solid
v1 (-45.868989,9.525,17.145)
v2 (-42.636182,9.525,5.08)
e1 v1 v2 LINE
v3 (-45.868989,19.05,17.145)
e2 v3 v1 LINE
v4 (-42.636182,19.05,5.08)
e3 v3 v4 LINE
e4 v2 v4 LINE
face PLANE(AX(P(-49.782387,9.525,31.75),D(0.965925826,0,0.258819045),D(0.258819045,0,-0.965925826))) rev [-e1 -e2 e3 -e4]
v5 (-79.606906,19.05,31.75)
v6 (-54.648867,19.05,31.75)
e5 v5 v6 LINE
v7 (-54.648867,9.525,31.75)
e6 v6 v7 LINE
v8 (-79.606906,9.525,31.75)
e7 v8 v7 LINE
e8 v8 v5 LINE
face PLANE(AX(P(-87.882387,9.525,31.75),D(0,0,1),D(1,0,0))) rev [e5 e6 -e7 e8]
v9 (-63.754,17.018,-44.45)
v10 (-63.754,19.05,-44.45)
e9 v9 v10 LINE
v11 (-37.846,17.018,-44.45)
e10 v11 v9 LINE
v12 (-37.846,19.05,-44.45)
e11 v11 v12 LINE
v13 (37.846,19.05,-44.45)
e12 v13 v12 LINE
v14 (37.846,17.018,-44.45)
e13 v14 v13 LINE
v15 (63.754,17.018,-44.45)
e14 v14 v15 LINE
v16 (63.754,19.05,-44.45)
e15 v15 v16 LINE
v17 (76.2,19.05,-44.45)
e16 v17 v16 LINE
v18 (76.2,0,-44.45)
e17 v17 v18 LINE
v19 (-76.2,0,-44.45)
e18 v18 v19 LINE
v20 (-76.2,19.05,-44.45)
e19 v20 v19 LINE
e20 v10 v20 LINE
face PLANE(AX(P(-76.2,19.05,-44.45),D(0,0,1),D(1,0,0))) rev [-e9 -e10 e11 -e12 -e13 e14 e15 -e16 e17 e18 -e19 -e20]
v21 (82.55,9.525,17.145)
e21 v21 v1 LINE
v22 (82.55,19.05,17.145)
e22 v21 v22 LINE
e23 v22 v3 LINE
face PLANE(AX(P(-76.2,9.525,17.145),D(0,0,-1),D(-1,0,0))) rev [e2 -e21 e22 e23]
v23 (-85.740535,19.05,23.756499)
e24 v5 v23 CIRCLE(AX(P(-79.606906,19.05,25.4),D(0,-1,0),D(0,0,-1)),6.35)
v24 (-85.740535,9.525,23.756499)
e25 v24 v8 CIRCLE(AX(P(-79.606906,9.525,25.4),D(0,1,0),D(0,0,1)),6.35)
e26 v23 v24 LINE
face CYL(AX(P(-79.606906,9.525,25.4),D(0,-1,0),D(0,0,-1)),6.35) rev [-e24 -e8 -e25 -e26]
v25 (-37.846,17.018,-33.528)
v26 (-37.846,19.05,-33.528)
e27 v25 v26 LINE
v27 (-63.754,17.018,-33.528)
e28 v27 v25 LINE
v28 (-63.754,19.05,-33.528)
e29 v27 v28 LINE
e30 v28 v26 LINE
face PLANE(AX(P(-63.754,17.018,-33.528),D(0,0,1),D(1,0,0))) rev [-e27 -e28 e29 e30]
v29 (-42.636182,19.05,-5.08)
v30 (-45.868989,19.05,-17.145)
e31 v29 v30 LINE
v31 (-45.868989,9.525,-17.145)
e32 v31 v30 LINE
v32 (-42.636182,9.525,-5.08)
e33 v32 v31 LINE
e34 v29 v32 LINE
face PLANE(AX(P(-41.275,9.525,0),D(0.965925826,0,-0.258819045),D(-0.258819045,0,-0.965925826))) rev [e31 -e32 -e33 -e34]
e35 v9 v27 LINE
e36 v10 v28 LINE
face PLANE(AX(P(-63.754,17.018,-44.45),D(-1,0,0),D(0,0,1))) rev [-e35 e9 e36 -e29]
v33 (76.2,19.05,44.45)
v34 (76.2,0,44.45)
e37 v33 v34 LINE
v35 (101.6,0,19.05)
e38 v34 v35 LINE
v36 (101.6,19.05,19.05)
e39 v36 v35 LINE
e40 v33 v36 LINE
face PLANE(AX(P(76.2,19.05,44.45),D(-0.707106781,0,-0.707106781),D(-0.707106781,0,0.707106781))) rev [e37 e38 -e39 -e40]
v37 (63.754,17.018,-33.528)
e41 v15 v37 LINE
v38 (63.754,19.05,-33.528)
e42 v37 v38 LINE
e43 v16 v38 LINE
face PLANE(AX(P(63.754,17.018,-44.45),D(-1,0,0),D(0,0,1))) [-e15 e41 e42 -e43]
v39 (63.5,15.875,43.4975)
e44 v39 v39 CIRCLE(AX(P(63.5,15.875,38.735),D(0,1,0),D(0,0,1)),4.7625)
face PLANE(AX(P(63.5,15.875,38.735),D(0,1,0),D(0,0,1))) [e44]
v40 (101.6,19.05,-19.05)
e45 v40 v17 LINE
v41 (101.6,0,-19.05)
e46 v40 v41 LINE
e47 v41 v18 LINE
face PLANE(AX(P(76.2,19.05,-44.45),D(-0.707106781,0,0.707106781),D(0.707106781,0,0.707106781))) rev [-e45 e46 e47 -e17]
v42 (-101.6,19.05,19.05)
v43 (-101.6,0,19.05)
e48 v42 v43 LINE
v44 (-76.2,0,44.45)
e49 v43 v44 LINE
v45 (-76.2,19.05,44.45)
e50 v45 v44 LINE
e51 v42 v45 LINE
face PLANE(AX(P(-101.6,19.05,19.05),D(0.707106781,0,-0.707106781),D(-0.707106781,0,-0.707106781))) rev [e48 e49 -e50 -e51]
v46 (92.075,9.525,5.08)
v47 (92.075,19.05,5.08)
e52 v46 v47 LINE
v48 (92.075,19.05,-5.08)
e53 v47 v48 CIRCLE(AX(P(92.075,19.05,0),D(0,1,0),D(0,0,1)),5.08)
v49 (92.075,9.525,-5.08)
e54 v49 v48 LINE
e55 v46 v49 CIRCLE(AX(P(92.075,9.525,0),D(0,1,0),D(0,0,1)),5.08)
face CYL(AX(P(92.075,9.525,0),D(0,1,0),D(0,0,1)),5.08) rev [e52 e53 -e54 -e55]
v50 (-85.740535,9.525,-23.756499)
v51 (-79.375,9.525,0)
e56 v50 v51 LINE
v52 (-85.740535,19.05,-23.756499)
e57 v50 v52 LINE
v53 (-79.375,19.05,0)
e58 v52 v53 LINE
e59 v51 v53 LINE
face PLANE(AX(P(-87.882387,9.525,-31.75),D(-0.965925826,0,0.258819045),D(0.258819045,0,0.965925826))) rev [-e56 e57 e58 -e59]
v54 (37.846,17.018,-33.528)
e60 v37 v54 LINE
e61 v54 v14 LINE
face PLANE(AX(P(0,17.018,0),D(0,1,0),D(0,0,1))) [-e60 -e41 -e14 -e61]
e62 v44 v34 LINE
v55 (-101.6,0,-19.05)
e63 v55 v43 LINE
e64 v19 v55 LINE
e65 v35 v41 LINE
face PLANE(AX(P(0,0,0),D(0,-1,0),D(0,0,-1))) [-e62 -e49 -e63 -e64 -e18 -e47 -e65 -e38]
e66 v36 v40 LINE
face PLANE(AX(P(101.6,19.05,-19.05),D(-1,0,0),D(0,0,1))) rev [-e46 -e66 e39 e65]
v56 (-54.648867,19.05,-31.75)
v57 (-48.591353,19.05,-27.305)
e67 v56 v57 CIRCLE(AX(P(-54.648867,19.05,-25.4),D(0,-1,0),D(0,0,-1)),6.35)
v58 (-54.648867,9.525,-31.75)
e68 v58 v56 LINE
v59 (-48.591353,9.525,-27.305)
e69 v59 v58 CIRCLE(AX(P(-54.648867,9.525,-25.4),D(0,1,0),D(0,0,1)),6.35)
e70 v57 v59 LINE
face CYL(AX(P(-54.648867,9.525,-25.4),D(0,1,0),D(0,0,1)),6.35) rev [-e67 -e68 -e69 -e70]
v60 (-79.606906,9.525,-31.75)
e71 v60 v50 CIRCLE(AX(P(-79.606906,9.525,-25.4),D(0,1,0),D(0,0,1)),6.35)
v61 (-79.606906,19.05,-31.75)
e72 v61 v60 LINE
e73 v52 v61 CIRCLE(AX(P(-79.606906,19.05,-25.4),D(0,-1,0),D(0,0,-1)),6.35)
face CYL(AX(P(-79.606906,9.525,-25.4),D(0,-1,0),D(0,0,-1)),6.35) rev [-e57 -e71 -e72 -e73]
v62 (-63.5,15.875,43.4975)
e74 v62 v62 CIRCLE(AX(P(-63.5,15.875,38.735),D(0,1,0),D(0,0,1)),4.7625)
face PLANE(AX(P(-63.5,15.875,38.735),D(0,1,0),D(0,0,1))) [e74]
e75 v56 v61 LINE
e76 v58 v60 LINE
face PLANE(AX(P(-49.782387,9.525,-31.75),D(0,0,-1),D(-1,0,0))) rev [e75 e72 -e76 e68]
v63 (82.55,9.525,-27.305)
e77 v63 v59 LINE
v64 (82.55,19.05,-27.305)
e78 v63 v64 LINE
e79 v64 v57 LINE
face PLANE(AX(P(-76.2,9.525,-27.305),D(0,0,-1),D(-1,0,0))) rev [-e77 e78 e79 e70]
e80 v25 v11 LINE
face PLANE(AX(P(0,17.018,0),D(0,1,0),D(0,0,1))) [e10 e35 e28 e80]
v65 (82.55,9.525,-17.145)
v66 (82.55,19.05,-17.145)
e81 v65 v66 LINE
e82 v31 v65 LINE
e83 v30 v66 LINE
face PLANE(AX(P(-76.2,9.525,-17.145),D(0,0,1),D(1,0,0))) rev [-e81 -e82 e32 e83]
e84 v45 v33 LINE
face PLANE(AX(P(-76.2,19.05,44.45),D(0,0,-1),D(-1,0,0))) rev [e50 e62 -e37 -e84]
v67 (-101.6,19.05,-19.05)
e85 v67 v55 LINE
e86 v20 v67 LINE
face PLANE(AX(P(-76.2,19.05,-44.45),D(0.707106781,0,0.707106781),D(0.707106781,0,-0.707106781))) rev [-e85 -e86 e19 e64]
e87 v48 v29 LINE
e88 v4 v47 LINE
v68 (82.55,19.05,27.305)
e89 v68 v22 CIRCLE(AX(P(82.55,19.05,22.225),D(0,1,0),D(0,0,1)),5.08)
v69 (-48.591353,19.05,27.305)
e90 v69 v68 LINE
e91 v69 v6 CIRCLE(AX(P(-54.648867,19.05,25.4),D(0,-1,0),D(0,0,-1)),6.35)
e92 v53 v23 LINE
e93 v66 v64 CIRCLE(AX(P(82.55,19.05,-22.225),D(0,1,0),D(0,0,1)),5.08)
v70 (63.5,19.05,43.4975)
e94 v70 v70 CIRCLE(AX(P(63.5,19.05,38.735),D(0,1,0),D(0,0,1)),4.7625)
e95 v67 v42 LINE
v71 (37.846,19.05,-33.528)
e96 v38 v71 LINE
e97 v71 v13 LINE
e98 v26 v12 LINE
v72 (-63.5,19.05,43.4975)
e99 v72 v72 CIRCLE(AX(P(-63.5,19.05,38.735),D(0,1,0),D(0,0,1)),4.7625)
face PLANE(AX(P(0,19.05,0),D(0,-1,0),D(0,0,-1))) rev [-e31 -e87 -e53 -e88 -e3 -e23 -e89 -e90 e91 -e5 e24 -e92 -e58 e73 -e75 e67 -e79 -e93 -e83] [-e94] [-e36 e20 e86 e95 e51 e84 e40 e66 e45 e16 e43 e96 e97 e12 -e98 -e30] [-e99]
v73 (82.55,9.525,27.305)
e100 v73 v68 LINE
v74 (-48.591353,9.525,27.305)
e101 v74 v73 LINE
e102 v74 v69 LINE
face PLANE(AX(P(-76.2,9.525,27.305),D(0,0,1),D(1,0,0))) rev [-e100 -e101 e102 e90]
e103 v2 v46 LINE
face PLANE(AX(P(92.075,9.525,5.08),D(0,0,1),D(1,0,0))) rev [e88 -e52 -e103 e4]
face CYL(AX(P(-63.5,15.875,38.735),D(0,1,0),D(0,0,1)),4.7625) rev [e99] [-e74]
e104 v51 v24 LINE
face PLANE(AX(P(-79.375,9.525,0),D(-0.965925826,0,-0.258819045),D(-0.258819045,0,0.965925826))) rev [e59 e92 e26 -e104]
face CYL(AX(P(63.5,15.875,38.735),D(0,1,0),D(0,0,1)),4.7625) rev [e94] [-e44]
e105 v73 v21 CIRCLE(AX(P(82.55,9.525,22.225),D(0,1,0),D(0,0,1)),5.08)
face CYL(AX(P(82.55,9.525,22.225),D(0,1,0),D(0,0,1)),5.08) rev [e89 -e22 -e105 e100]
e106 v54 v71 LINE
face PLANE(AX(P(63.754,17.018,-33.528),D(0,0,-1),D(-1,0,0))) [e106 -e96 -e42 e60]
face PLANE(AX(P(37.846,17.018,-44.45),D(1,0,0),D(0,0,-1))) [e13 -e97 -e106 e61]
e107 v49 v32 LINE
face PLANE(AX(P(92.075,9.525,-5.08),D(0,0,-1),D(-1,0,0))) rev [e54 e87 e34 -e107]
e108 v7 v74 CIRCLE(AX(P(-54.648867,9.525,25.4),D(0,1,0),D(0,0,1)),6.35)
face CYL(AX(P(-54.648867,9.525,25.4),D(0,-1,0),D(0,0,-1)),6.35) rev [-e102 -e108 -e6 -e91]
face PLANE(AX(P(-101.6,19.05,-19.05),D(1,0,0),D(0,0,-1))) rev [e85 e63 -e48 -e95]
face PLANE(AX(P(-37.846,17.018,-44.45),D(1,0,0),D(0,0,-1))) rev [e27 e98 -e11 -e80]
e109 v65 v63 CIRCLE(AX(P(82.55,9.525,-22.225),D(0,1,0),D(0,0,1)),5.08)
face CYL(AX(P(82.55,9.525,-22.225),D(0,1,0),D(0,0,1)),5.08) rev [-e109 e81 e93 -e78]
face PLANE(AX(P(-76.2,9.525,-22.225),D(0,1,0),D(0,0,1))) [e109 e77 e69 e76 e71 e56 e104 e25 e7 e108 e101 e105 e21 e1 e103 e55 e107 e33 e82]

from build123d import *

# Parameters (mm, degrees)
BOSS_EXTRUDE1_DEPTH = 19.05
CUT_EXTRUDE1_DEPTH  = 9.525
CUT_EXTRUDE2_DEPTH  = 9.525
FILLET2_R           = 6.35
SKETCH5_R           = 4.7625
CUT_EXTRUDE3_DEPTH  = 3.175
SKETCH6_W           = 25.908
SKETCH6_H           = 10.922
CUT_EXTRUDE4_DEPTH  = 2.032


with BuildPart() as part:
    # Sketch1 → Boss-Extrude1 (new body)
    with BuildSketch(Plane(origin=(0, 0, 0), x_dir=(1, 0, 0), z_dir=(0, 1, 0))):
        Polygon((-101.6, -19.05), (-76.2, -44.45), (76.2, -44.45), (101.6, -19.05), (101.6, 19.05), (76.2, 44.45), (-76.2, 44.45), (-101.6, 19.05), align=None)
    extrude(amount=BOSS_EXTRUDE1_DEPTH)

    # Sketch2 → Cut-Extrude1 (cut)
    with BuildSketch(Plane(origin=(0, 19.05, 0), x_dir=(1, 0, 0), z_dir=(0, 1, 0))):
        with BuildLine():
            Line((-76.2, 27.305), (82.55, 27.305))
            ThreePointArc((82.55, 27.305), (87.63, 22.225), (82.55, 17.145))
            Line((82.55, 17.145), (-76.2, 17.145))
            ThreePointArc((-76.2, 17.145), (-81.28, 22.225), (-76.2, 27.305))
        make_face()
        with BuildLine():
            Line((92.075, -5.08), (-66.675, -5.08))
            ThreePointArc((-66.675, -5.08), (-71.755, 0), (-66.675, 5.08))
            Line((-66.675, 5.08), (92.075, 5.08))
            ThreePointArc((92.075, 5.08), (97.155, 0), (92.075, -5.08))
        make_face()
        with BuildLine():
            Line((-76.2, -17.145), (82.55, -17.145))
            ThreePointArc((82.55, -17.145), (87.63, -22.225), (82.55, -27.305))
            Line((82.55, -27.305), (-76.2, -27.305))
            ThreePointArc((-76.2, -27.305), (-81.28, -22.225), (-76.2, -17.145))
        make_face()
    extrude(amount=-CUT_EXTRUDE1_DEPTH, mode=Mode.SUBTRACT)

    # Sketch3 → Cut-Extrude2 (cut)
    with BuildSketch(Plane(origin=(0, 19.05, 0), x_dir=(1, 0, 0), z_dir=(0, 1, 0))):
        Polygon((-87.88238686, 31.75), (-79.375, 0), (-87.88238686, -31.75), (-49.78238686, -31.75), (-41.275, 0), (-49.78238686, 31.75), align=None)
    extrude(amount=-CUT_EXTRUDE2_DEPTH, mode=Mode.SUBTRACT)

    # Fillet2
    # the kernel refuses this fillet: 6.35 mm, written as the material it adds along each edge
    with BuildSketch(Plane(origin=(-49.78238686, 19.05, 31.75), x_dir=(-1, 0, 0), z_dir=(0, -1, 0))) as fillet2_piece_1:
        with BuildLine():
            CenterArc((4.866479769, 6.35), FILLET2_R, 197.457603124, 72.542396876)
            Line((-1.19103416, 4.445), (0, 0))
            Line((0, 0), (4.866479769, 0))
        make_face()
    extrude(amount=9.525)
    with BuildSketch(Plane(origin=(-49.78238686, 19.05, -31.75), x_dir=(0.2588190451025257, 0, 0.9659258262890671), z_dir=(0, -1, 0))) as fillet2_piece_2:
        with BuildLine():
            CenterArc((4.87409135, 6.344159428), FILLET2_R, 195, 72.542396876)
            Line((-1.259537647, 4.700658492), (0, 0))
            Line((0, 0), (4.601802622, 0))
        make_face()
    extrude(amount=9.525)
    with BuildSketch(Plane(origin=(-87.88238686, 19.05, 31.75), x_dir=(0.2588190451025169, 0, -0.9659258262890692), z_dir=(0, -1, 0)), Plane(origin=(-87.88238686, 19.05, -31.75), x_dir=(1, 0, 0), z_dir=(0, -1, 0))) as fillet2_piece_3:
        with BuildLine():
            CenterArc((FILLET2_R * 1.30322537284, FILLET2_R), FILLET2_R, 165, 105)
            Line((FILLET2_R * 0.337299546552, FILLET2_R * 1.2588190451), (0, 0))
            Line((0, 0), (FILLET2_R * 1.30322537284, 0))
        make_face()
    extrude(amount=9.525)

    # Sketch5 → Cut-Extrude3 (cut)
    with BuildSketch(Plane(origin=(0, 19.05, 0), x_dir=(1, 0, 0), z_dir=(0, 1, 0))):
        with Locations(Location((-63.5, -38.735, 0), (0, 0, 270))):
            Circle(SKETCH5_R)
        with Locations(Location((63.5, -38.735, 0), (0, 0, 270))):
            Circle(SKETCH5_R)
    extrude(amount=-CUT_EXTRUDE3_DEPTH, mode=Mode.SUBTRACT)

    # Sketch6 → Cut-Extrude4 (cut)
    with BuildSketch(Plane(origin=(0, 19.05, 0), x_dir=(1, 0, 0), z_dir=(0, 1, 0))):
        with Locations((-50.8, 38.989)):
            Rectangle(SKETCH6_W, SKETCH6_H)
    cut_extrude4 = extrude(amount=-CUT_EXTRUDE4_DEPTH, mode=Mode.SUBTRACT)

    # Mirror1: Cut-Extrude4 across plane
    add(cut_extrude4.mirror(Plane(origin=(0, 0, 0), x_dir=(0, 0, 1), z_dir=(1, 0, 0))), mode=Mode.SUBTRACT)


solid = part.part
